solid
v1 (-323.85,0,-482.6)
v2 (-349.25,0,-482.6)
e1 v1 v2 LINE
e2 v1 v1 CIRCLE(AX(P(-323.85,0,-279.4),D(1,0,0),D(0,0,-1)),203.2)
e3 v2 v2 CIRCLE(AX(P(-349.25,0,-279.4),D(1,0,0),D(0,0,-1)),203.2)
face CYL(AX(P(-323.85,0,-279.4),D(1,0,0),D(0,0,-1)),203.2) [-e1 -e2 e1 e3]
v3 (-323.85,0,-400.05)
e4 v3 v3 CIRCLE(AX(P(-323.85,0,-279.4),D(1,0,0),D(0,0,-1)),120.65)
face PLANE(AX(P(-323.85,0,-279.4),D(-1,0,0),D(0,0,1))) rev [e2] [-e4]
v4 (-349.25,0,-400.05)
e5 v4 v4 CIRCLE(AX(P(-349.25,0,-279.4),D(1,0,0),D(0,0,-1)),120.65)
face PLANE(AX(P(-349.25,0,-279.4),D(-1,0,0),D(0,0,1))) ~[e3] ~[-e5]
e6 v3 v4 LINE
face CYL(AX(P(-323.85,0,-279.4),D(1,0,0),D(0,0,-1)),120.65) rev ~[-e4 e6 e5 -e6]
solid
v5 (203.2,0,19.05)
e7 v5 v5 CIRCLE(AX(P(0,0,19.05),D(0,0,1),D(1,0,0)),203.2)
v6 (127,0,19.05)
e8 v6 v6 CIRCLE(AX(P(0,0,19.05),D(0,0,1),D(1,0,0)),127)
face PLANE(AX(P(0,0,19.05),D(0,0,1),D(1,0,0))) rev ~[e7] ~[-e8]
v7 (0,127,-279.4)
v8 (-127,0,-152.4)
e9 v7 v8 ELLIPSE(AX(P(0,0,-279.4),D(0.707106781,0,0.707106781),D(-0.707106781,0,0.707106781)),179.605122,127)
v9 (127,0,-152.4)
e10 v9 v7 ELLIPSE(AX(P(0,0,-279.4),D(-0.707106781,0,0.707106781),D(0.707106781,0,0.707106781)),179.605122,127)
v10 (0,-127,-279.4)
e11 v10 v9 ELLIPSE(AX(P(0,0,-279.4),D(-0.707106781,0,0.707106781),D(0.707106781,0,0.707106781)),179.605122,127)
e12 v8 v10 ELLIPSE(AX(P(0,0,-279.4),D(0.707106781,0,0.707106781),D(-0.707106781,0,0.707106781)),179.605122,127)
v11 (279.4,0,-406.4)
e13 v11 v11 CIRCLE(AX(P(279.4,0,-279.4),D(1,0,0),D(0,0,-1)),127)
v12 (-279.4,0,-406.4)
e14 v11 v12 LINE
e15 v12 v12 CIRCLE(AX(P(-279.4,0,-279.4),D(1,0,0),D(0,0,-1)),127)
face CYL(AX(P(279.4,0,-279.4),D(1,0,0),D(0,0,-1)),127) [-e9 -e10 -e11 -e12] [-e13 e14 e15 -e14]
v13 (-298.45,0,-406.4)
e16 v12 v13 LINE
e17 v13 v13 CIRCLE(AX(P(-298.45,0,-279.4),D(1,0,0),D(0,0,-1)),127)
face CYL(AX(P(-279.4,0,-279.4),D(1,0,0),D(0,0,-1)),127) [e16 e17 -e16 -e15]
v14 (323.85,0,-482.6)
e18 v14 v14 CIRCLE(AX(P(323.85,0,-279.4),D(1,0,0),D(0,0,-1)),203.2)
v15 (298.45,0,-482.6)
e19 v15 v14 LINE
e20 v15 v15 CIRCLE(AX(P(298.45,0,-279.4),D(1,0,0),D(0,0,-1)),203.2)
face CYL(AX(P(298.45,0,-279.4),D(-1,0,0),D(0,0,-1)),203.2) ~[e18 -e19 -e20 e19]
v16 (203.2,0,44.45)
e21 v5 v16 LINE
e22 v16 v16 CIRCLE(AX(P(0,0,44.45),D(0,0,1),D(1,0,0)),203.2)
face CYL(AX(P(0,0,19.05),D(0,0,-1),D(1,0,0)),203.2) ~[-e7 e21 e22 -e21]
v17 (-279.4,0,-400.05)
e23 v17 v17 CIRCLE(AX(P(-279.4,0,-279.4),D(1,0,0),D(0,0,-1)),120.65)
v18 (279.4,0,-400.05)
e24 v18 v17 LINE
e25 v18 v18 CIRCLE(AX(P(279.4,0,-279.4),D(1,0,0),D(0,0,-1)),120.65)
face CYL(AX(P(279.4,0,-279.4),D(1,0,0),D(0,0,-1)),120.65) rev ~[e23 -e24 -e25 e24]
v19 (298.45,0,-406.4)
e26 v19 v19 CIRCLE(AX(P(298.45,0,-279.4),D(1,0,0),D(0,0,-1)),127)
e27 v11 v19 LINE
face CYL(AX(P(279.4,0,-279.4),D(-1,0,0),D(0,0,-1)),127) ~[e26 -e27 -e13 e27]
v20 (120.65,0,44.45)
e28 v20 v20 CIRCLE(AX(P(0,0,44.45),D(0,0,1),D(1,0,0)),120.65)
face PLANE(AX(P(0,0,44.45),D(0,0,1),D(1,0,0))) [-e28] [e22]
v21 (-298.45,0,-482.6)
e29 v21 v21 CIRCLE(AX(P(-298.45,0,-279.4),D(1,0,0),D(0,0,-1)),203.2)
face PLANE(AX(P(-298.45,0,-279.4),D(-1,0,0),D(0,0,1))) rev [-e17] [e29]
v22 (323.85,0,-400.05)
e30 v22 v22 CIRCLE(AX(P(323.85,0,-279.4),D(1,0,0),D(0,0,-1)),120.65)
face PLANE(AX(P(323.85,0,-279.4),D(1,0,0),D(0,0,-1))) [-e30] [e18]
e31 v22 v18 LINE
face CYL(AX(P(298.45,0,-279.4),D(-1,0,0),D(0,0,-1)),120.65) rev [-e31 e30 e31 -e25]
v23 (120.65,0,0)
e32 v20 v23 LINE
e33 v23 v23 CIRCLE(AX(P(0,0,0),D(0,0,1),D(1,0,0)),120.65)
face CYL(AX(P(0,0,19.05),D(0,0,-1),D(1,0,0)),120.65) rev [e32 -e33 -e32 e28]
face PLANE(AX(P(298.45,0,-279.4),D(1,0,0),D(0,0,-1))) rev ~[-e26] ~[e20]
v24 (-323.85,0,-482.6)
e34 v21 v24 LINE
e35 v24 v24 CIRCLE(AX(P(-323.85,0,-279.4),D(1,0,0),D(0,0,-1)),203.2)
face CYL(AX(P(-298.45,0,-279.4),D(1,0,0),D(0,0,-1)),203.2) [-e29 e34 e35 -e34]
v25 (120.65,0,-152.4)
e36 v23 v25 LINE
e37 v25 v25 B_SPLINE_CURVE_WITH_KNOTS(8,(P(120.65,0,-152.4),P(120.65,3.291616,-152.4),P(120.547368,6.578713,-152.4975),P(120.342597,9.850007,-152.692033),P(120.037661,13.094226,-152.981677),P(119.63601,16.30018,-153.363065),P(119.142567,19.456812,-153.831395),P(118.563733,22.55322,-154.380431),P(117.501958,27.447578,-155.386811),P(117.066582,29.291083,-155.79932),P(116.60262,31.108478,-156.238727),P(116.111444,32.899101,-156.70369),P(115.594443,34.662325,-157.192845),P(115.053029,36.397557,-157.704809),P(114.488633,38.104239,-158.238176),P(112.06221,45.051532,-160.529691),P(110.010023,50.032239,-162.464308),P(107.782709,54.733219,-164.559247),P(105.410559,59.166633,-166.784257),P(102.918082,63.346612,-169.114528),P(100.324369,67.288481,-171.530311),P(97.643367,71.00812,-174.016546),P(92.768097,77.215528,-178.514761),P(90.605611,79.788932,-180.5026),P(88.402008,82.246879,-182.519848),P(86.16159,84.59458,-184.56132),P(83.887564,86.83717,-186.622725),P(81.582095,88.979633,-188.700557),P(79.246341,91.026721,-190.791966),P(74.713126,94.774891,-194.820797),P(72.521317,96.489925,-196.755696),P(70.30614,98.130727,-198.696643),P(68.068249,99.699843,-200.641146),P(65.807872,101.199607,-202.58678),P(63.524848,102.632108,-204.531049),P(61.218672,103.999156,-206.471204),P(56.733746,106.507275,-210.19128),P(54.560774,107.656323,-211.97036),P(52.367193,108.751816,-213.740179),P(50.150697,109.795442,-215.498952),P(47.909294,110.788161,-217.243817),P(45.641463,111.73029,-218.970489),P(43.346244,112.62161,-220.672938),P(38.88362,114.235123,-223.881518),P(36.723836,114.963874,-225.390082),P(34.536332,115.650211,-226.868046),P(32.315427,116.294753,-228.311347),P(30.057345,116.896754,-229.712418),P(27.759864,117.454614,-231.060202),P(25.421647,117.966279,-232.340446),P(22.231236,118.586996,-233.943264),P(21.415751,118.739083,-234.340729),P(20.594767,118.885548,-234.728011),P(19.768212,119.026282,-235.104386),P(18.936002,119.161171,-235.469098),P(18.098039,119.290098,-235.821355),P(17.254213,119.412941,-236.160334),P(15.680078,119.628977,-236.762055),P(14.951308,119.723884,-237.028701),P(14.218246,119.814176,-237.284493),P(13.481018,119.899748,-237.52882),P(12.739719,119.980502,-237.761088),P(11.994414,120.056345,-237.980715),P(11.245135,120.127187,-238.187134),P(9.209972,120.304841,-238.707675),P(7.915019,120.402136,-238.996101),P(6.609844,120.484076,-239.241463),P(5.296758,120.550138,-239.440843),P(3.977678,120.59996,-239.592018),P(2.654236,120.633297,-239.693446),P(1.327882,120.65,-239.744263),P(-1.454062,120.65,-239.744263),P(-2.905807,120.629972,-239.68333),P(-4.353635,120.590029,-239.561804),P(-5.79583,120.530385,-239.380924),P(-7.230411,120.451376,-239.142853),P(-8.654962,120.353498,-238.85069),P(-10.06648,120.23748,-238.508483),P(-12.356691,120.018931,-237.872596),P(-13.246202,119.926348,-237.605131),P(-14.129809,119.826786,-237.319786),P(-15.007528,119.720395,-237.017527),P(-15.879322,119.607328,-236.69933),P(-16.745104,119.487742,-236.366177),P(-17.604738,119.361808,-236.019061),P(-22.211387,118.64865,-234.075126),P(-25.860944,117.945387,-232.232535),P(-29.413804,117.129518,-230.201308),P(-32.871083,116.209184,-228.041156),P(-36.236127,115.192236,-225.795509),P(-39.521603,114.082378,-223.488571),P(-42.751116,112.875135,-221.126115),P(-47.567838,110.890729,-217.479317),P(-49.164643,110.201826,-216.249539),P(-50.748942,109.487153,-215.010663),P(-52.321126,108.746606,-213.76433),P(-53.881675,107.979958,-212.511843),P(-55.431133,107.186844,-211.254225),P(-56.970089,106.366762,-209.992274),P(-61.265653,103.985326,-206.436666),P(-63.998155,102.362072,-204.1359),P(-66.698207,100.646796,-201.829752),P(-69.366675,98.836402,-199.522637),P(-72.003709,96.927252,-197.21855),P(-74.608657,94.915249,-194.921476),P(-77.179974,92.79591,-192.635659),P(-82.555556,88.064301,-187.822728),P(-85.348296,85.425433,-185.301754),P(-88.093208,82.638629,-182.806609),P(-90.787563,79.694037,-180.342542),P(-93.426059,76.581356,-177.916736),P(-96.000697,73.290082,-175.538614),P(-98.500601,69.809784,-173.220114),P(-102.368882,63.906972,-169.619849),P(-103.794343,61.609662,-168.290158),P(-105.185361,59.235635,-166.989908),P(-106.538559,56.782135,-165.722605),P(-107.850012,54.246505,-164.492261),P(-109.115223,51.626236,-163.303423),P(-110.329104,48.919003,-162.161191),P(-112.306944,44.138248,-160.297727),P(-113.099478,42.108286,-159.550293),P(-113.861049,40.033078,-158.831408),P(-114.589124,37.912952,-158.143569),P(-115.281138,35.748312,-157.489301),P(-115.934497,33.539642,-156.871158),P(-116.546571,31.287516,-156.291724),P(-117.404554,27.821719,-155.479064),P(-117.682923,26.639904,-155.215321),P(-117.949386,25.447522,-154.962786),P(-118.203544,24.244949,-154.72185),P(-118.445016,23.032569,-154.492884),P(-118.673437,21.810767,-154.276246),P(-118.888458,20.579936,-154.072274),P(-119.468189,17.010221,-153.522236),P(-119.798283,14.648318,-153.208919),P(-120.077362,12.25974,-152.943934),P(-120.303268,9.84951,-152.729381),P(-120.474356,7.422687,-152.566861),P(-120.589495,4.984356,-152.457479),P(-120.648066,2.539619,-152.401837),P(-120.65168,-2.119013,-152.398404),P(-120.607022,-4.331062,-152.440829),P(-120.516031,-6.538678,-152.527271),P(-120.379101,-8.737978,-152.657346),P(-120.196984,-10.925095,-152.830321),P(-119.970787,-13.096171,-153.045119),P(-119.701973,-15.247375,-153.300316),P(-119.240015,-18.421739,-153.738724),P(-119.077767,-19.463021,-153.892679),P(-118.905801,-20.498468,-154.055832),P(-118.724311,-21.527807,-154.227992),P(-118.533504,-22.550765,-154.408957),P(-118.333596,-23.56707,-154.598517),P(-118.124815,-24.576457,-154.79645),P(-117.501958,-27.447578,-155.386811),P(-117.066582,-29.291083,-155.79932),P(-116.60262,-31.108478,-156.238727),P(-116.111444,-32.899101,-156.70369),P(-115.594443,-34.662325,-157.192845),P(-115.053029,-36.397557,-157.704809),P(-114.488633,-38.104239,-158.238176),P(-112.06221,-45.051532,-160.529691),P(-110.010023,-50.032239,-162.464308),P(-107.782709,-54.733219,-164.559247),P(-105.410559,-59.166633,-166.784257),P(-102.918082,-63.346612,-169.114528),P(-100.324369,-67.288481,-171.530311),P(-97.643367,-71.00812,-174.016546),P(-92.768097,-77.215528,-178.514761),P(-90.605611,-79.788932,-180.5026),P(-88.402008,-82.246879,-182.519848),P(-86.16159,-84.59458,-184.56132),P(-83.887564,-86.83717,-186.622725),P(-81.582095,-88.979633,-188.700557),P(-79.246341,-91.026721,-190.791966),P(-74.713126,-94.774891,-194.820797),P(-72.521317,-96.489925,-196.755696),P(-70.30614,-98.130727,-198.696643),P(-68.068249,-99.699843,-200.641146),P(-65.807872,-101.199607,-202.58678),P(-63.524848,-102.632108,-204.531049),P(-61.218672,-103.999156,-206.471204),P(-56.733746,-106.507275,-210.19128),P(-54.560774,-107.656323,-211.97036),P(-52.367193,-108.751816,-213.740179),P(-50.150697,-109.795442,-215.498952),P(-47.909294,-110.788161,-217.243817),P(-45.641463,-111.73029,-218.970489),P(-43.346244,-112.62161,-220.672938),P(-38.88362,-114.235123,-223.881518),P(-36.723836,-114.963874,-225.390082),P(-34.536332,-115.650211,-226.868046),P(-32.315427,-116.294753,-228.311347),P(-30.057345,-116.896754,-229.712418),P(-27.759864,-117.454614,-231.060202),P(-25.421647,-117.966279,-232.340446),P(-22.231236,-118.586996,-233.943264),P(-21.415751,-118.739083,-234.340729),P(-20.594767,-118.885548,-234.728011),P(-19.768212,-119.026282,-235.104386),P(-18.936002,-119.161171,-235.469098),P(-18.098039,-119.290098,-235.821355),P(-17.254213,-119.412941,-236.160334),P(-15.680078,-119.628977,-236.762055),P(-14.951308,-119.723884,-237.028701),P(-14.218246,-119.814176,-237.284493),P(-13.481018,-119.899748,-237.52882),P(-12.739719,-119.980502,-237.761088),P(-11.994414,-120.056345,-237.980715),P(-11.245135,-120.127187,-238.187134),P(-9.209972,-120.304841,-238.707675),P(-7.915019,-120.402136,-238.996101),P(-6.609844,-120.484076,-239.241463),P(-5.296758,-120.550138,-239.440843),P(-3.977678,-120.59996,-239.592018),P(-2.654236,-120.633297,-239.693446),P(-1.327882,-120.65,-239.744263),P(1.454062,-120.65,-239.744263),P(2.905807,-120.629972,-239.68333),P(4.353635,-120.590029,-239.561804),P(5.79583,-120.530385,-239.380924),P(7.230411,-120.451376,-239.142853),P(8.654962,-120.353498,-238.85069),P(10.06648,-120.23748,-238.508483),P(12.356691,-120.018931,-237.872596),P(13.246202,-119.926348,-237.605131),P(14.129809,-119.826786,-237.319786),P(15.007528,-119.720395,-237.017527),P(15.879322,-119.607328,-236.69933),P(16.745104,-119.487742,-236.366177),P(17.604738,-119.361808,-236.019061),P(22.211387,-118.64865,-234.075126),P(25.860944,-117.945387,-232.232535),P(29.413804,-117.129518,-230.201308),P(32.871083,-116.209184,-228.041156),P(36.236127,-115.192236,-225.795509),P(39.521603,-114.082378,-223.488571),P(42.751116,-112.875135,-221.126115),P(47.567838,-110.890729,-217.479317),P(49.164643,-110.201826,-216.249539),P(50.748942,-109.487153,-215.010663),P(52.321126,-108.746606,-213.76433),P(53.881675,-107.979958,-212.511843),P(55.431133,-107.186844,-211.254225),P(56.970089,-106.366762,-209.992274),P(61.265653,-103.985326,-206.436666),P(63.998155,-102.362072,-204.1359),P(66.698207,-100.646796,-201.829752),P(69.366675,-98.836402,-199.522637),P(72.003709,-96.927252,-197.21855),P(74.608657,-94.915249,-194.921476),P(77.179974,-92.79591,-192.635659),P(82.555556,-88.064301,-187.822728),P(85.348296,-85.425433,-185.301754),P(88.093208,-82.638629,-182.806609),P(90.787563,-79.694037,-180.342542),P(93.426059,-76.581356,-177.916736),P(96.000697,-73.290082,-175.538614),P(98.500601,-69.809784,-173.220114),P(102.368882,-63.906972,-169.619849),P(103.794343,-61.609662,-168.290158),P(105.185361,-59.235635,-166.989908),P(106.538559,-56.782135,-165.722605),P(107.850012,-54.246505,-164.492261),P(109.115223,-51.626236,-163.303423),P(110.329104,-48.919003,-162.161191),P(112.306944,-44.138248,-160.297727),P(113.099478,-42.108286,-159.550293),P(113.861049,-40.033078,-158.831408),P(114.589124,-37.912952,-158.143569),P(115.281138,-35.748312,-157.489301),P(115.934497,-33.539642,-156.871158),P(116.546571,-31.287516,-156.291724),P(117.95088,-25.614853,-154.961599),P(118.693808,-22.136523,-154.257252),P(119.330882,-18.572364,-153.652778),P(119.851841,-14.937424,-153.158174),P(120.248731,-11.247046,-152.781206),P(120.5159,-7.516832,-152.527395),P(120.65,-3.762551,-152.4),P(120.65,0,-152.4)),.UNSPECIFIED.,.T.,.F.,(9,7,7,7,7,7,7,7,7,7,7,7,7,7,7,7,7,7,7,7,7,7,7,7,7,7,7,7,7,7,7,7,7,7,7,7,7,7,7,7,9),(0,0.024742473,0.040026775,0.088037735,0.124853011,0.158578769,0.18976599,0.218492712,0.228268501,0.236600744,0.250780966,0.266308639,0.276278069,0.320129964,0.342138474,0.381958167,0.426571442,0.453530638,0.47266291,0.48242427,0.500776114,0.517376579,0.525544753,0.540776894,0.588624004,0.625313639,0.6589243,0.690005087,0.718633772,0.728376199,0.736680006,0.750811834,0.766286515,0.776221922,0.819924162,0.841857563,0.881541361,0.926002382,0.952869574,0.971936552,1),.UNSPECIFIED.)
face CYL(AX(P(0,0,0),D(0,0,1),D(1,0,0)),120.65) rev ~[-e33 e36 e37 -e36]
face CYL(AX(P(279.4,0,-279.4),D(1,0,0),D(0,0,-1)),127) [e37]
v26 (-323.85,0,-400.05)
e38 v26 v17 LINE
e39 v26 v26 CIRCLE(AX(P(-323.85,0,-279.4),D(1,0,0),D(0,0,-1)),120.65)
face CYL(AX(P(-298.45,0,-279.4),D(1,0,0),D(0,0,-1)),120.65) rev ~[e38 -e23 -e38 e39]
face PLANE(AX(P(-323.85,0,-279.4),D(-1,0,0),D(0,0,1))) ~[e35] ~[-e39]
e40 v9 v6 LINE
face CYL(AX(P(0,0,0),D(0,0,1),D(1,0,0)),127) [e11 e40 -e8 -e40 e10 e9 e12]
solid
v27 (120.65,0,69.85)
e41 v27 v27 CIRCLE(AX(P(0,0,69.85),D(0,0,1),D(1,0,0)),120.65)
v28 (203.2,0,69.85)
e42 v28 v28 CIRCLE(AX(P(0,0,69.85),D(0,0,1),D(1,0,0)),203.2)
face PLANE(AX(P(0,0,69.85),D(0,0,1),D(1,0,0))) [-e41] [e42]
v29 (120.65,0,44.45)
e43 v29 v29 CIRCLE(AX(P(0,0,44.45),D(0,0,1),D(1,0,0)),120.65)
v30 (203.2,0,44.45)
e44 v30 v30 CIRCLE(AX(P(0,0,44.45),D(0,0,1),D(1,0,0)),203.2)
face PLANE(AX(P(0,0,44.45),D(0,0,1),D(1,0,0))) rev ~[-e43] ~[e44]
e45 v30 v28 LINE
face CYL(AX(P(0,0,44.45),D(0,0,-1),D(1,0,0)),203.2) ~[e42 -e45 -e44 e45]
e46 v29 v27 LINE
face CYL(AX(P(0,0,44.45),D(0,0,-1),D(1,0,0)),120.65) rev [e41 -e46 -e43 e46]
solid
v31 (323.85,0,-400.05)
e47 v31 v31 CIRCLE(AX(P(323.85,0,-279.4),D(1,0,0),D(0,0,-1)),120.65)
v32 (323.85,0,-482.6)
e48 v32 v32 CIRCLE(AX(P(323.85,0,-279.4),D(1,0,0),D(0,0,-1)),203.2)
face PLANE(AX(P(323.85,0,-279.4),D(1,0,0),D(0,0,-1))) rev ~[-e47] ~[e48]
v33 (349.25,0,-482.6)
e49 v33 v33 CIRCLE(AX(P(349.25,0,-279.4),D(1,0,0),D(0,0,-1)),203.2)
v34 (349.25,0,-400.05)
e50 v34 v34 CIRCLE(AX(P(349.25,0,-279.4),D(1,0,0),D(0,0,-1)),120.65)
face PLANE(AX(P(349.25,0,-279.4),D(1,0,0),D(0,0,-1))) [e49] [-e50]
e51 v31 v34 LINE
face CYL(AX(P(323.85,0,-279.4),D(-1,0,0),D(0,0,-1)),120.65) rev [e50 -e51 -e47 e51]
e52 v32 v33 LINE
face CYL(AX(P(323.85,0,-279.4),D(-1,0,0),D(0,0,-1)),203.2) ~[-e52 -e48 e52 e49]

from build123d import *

# Parameters (mm, degrees)
F0_R      = 127
F0_R_2    = 120.65
F1_DEPTH  = 19.05
F2_R      = 203.2
F2_R_2    = 127
F2_R_3    = 120.65
F3_DEPTH  = 25.4
F9_ANGLE  = 90
F11_DEPTH = 558.8
F12_REACH = 841.8112448428
F13_DEPTH = 25.4
F14_DEPTH = 25.4
F15_DEPTH = 25.4


with BuildPart() as f1:
    # F0 (on Top) → F1 (new body)
    with BuildSketch(Plane.XY):
        Circle(F0_R)
        Circle(F0_R_2, mode=Mode.SUBTRACT)
    extrude(amount=F1_DEPTH)

    # F2 (on face) → F3 (join)
    with BuildSketch(Plane.XY.offset(19.05)):
        Circle(F2_R)
        Circle(F2_R_2, mode=Mode.SUBTRACT)
        Circle(F2_R_2)
        Circle(F2_R_3, mode=Mode.SUBTRACT)
    extrude(amount=F3_DEPTH)


with BuildPart() as f7_1:
    # F7: copy of F1
    add(f1.part.moved(Location((279.4, 0, -279.4))))


with BuildPart() as f7_1_1:
    # F9: moved
    add(f7_1.part.rotate(Axis((279.4, 122.1911609173, -279.4), (0, 1, 0)), F9_ANGLE))


with BuildPart() as f10_1:
    # F10: instance of F7_1
    add(f7_1_1.part.mirror(Plane.YZ))


with BuildPart() as f7_1_2:
    add(f7_1_1.part)

    # F11 (add, through all): a face of the model
    f11_faces = [f7_1_2.faces().sort_by_distance(p)[0] for p in [
        (279.4, 0, -155.9921024484),
    ]]

    add(f10_1.part)  # F11 merges F10_1
    extrude(f11_faces, amount=F11_DEPTH)


with BuildPart() as f1_1:
    add(f1.part)

    add(f7_1_2.part)  # F12 merges F7_1
    f12_end = f1_1.faces().sort_by_distance((0, 0, -152.4))[0]
    # F0 (on Top) → F12 (join, up to a face of the model that its end follows)
    with BuildSketch(Plane.XY):
        Circle(F0_R)
        Circle(F0_R_2, mode=Mode.SUBTRACT)
    f12_long = extrude(amount=-F12_REACH, mode=Mode.PRIVATE)
    add(split(f12_long, bisect_by=f12_end, keep=Keep.ALL, mode=Mode.PRIVATE).solids().sort_by_distance((-123.4078975516, 0, 0))[0])


with BuildPart() as f13:
    # F13 (new): a face of the model
    f13_faces = [f1_1.part.faces().sort_by_distance(p)[0] for p in [
        (323.85, 0, -81.9473639175),
    ]]
    extrude(f13_faces, amount=F13_DEPTH)


with BuildPart() as f14:
    # F14 (new): a face of the model
    f14_faces = [f1_1.part.faces().sort_by_distance(p)[0] for p in [
        (-323.85, 0, -81.9473639175),
    ]]
    extrude(f14_faces, amount=F14_DEPTH)


with BuildPart() as f15:
    # F15 (new): a face of the model
    f15_faces = [f1_1.part.faces().sort_by_distance(p)[0] for p in [
        (-197.4526360825, 0, 44.45),
    ]]
    extrude(f15_faces, amount=F15_DEPTH)


solid = Compound([f1_1.part, f13.part, f14.part, f15.part])
